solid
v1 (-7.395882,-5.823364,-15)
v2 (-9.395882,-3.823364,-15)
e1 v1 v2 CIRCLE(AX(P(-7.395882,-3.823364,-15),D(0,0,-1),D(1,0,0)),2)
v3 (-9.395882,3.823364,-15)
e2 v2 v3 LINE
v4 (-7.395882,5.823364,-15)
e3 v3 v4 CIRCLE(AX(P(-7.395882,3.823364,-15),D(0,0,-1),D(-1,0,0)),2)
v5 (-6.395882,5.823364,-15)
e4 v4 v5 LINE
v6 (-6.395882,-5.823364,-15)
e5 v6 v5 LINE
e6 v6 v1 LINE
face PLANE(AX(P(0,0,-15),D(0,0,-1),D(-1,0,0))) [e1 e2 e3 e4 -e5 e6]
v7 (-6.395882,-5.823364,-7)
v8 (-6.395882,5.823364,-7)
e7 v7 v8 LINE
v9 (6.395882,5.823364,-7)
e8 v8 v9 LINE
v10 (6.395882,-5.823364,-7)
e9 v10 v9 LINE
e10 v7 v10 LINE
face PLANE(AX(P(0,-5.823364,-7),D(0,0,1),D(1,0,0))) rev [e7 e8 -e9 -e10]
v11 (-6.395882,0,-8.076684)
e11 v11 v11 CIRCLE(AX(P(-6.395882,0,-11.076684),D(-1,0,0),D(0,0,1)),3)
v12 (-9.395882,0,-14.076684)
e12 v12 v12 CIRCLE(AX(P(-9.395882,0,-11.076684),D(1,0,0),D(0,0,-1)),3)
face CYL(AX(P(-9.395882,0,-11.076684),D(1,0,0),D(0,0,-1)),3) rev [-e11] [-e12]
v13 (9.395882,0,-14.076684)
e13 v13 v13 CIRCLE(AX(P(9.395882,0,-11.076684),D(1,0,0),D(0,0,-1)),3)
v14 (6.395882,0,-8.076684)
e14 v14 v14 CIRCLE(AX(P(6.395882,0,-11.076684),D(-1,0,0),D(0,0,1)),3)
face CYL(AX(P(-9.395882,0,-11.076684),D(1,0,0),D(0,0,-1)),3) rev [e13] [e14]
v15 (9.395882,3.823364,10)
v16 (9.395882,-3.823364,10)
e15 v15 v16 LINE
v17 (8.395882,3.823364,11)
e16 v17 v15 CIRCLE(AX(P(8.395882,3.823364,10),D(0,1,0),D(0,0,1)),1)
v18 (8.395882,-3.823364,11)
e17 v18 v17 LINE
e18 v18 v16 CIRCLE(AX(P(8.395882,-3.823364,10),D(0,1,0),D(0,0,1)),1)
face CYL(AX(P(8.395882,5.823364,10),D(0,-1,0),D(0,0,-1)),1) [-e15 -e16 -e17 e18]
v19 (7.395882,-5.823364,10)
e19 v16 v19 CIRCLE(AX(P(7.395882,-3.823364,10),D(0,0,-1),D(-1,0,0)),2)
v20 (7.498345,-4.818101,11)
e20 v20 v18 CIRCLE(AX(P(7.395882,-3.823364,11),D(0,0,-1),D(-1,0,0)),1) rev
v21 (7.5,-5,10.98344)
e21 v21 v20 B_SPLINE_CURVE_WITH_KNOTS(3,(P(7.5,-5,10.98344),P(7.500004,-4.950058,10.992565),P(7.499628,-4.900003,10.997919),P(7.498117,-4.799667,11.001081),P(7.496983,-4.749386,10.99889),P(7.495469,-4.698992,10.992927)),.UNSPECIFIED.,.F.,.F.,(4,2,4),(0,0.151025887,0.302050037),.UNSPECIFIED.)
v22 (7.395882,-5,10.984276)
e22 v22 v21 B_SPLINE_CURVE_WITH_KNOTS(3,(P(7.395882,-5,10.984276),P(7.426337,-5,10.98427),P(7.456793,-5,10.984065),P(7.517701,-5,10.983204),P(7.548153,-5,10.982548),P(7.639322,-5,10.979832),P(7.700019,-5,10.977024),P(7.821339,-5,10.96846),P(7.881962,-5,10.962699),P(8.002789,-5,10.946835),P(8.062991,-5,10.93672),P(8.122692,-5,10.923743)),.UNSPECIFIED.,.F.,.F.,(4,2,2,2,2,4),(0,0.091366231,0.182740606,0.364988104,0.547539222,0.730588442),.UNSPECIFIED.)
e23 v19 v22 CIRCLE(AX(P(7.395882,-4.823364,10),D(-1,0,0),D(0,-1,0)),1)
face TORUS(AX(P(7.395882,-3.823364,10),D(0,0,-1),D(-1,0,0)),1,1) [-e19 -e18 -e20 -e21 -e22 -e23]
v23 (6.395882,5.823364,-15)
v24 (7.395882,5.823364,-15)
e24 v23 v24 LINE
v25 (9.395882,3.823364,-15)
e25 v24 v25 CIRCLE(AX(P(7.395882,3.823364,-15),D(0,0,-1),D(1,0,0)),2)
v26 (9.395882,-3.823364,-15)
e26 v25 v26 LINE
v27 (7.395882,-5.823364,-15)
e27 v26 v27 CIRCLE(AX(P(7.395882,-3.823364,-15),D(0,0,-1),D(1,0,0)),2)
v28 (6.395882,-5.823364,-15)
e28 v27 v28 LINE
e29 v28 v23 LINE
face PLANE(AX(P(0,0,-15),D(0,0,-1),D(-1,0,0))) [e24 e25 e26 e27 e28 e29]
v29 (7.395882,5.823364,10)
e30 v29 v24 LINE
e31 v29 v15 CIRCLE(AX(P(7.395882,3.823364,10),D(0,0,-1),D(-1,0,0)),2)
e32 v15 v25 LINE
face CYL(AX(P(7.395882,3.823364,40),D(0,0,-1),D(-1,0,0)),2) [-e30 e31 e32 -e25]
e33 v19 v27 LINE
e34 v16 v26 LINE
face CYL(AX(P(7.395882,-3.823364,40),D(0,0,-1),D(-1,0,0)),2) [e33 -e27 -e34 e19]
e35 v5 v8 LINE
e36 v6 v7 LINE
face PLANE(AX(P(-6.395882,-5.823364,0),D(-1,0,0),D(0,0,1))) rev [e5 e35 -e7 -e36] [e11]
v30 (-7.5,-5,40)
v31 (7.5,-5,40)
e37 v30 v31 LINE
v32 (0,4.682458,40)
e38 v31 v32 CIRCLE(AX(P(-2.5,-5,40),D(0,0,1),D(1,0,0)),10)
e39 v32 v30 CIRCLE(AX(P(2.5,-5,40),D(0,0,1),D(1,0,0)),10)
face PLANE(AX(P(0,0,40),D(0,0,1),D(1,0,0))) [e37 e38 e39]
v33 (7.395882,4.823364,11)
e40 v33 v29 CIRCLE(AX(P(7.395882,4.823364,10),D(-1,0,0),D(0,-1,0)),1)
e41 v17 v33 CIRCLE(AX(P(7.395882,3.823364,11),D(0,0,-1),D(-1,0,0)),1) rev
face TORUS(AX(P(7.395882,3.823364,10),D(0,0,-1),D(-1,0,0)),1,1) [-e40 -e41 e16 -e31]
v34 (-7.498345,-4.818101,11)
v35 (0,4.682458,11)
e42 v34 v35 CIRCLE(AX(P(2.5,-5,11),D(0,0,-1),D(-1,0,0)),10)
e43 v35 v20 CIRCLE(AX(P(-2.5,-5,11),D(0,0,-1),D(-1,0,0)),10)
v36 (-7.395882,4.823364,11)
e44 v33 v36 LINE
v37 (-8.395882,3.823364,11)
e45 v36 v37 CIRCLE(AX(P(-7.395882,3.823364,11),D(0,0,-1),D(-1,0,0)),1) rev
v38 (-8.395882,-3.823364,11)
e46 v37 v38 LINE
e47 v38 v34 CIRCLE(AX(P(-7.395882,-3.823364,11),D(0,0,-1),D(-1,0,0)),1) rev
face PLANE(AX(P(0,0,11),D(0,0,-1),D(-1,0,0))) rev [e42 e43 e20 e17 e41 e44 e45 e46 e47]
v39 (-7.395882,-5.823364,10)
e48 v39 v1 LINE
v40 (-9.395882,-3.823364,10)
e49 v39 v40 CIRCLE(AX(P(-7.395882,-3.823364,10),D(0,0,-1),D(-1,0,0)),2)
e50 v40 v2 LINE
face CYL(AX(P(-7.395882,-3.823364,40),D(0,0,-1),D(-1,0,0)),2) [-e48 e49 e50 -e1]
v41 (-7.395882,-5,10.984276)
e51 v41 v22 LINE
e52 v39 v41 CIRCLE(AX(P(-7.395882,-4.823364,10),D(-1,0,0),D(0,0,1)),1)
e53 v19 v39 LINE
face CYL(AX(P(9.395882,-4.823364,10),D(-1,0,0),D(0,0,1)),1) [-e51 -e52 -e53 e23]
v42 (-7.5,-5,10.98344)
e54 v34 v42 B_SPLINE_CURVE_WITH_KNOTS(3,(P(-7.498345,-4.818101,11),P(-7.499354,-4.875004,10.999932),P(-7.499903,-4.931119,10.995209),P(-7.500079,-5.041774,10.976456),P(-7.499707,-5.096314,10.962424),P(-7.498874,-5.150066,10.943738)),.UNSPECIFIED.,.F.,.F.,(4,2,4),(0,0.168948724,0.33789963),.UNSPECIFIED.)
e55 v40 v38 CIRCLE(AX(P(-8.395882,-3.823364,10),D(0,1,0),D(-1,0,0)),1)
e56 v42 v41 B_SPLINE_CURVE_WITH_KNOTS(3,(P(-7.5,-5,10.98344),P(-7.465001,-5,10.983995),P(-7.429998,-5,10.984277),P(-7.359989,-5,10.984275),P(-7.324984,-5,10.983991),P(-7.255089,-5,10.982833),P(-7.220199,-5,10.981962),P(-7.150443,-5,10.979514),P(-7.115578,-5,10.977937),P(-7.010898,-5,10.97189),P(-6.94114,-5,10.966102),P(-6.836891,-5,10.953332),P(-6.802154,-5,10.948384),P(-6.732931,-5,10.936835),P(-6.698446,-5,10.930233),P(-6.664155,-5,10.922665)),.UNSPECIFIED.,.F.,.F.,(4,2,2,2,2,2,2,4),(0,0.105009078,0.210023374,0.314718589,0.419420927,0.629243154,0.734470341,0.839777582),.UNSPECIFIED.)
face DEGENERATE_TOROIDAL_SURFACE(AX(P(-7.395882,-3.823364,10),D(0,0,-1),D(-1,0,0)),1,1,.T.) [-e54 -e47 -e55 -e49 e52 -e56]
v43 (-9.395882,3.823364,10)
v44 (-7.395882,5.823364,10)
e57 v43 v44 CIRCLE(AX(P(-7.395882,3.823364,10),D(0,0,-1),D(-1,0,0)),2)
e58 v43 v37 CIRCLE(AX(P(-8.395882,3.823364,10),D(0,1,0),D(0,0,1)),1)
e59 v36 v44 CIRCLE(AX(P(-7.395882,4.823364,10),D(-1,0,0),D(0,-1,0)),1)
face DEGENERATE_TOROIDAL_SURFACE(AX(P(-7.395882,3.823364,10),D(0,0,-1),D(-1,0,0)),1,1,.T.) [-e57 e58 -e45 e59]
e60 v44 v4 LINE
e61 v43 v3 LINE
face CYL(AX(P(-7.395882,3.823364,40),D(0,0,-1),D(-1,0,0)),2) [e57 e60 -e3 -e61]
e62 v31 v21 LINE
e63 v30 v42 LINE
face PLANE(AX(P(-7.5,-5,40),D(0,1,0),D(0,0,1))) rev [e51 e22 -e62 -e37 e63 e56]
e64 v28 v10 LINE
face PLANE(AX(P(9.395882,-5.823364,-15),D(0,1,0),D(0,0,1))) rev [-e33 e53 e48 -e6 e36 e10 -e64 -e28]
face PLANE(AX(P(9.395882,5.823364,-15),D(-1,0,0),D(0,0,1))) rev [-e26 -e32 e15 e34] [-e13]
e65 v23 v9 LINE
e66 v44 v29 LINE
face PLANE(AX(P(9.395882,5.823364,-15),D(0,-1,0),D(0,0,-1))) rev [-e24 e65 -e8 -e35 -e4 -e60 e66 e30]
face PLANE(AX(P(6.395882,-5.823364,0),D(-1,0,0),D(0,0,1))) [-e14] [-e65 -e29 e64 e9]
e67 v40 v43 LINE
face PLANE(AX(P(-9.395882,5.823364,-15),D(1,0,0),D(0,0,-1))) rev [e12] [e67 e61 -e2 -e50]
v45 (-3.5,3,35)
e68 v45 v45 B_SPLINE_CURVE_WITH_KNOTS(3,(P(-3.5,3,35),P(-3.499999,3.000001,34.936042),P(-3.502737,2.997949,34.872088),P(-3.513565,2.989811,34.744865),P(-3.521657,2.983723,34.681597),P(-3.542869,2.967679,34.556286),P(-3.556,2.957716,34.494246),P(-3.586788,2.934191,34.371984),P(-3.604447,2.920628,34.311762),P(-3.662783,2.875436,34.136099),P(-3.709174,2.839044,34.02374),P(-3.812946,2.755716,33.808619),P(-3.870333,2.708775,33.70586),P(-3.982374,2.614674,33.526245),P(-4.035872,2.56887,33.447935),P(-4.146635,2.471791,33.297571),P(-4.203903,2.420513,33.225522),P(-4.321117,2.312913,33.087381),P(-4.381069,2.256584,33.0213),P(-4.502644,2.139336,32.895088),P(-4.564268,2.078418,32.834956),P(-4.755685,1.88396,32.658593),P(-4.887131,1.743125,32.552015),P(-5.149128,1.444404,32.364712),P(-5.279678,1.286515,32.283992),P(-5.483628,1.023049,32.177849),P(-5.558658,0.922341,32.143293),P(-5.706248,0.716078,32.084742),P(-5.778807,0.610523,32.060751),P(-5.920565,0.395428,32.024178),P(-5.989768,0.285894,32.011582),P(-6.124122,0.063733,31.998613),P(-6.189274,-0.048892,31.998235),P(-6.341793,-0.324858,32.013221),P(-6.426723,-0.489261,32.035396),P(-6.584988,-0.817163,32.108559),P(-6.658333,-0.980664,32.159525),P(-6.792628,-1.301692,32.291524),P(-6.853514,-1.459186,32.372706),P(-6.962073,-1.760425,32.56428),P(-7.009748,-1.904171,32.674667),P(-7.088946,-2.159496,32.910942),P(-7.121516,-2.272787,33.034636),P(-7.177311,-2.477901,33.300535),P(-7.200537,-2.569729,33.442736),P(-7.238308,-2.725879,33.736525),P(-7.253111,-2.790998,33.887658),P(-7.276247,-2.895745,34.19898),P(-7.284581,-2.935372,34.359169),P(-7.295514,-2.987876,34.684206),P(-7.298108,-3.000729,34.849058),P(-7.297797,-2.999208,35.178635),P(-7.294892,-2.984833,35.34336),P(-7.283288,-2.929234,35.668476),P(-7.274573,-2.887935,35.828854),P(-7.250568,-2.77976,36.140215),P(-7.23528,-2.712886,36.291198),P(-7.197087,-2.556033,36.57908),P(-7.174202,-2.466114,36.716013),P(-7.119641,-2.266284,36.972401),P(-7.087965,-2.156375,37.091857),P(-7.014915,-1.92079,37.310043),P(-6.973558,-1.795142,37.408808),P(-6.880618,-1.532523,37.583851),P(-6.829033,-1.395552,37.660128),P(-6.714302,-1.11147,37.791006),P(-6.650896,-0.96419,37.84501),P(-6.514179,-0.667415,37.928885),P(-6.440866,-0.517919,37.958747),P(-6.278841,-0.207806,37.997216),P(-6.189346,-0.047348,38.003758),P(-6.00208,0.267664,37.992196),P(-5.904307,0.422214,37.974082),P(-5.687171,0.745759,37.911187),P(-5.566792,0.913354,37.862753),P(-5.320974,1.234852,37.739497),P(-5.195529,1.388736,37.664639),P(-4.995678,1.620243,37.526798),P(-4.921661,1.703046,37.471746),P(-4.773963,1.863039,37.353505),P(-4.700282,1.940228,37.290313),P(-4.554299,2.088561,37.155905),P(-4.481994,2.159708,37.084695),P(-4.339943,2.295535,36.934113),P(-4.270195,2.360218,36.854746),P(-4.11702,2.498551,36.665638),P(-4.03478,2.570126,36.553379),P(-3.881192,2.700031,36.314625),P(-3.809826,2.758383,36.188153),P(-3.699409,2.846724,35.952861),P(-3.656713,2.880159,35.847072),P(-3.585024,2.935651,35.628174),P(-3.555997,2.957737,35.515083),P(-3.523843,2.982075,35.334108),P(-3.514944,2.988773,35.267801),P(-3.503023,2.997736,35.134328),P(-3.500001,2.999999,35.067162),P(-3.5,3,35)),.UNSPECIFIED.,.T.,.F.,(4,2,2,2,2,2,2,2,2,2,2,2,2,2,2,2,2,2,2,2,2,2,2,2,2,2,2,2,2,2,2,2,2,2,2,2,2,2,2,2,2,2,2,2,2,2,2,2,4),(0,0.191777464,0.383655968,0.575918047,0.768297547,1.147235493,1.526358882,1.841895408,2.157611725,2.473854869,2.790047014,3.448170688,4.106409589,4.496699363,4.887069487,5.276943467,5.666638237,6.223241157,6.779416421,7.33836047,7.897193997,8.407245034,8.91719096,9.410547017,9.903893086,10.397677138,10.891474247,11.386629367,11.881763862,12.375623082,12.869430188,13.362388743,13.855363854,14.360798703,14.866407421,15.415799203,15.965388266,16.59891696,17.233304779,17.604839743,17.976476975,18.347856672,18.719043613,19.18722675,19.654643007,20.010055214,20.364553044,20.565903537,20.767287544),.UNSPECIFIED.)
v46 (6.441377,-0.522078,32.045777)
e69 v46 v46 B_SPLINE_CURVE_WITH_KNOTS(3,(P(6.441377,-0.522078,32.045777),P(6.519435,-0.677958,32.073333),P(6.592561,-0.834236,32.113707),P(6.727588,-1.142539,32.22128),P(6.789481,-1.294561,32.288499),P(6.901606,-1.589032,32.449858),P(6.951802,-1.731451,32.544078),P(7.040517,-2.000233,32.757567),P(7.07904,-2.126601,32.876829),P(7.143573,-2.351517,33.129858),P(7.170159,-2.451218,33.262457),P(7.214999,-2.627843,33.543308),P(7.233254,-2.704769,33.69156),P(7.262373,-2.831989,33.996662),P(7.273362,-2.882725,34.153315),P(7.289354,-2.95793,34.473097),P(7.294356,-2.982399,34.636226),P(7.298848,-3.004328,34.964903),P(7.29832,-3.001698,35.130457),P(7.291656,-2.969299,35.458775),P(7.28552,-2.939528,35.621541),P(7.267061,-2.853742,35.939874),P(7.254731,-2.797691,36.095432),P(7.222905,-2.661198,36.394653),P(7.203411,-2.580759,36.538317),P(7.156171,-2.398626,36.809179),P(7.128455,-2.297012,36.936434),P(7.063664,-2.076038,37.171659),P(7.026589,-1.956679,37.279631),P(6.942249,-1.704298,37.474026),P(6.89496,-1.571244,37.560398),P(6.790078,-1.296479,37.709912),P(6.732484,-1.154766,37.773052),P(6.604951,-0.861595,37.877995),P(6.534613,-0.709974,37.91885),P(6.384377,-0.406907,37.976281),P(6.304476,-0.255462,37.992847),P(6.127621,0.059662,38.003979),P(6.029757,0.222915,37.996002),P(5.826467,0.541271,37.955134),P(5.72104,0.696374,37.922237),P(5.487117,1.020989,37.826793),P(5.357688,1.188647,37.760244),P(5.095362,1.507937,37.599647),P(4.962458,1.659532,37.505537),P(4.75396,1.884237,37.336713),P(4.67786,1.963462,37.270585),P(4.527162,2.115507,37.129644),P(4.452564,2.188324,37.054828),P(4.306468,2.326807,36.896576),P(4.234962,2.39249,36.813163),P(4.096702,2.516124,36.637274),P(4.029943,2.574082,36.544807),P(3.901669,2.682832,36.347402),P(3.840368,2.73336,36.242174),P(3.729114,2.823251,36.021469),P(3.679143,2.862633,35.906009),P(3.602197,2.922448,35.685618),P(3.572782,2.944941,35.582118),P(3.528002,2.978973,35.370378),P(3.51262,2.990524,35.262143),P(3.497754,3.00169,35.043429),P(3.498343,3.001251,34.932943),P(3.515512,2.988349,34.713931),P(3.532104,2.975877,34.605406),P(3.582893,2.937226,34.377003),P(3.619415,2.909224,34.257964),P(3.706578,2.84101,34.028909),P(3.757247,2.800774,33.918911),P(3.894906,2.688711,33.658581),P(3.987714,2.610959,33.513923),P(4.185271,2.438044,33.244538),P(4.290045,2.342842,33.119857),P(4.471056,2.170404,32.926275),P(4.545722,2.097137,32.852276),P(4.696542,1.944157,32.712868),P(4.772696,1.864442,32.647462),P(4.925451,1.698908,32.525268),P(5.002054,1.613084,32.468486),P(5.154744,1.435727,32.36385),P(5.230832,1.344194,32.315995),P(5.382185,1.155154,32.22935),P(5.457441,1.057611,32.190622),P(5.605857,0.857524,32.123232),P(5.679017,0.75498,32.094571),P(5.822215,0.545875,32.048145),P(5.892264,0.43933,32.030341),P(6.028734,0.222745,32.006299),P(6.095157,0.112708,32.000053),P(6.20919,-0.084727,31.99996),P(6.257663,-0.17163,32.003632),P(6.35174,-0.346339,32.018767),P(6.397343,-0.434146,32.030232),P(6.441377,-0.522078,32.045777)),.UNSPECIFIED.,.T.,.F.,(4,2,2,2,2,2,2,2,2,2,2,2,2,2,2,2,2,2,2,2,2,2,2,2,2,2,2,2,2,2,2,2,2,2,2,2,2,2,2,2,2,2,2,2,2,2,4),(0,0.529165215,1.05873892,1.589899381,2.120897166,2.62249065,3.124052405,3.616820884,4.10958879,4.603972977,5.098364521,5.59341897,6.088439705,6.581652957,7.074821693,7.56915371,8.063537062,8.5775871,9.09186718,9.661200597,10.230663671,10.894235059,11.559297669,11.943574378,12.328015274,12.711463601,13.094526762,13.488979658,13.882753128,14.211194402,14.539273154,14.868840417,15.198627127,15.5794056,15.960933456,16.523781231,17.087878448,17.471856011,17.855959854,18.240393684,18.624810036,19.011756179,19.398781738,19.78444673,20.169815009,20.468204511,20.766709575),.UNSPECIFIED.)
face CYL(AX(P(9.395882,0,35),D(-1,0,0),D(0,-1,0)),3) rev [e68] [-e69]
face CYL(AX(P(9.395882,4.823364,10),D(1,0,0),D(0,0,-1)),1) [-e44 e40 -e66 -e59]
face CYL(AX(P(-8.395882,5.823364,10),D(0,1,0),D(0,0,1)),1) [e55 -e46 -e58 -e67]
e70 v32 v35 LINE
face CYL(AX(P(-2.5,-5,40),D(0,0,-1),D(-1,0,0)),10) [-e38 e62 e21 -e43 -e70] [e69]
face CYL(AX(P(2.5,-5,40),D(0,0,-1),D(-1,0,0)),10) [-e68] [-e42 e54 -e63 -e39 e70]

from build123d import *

# Parameters (mm, degrees)
SKETCH1_W                = 15
SKETCH1_H                = 10
BOSS_EXTRUDE1_DEPTH      = 40
BOSS_EXTRUDE2_DEPTH      = 15
BOSS_EXTRUDE2_DEPTH_BACK = 11
SKETCH3_W                = 18.791763322
SKETCH3_H                = 11.646727992
SKETCH4_W                = 12.791763322
SKETCH4_H                = 8
CUT_EXTRUDE1_DEPTH       = 43.707480201
SKETCH5_R                = 3
CUT_EXTRUDE2_DEPTH       = 44.810756502
CUT_EXTRUDE3_DEPTH       = 49.282441533
CUT_EXTRUDE3_DEPTH_BACK  = 49.282441533
SKETCH6_OUTSIDE_W        = 32.648
SKETCH6_OUTSIDE_H        = 25.502
FILLET1_R                = 10
FILLET2_R                = 1
SKETCH7_R                = 3
CUT_EXTRUDE4_DEPTH       = 45.576248719


with BuildPart() as part:
    # Sketch1 → Boss-Extrude1 (new body)
    with BuildSketch(Plane.XY):
        Rectangle(SKETCH1_W, SKETCH1_H)
    extrude(amount=BOSS_EXTRUDE1_DEPTH)

    # Sketch3 → Boss-Extrude2 (add, two sides: drawn at the far end of the back side and taken through both)
    with BuildSketch(Plane(origin=(0, 0, 0), x_dir=(-1, 0, 0), z_dir=(0, 0, -1)).offset(-BOSS_EXTRUDE2_DEPTH_BACK)):
        Rectangle(SKETCH3_W, SKETCH3_H)
    extrude(amount=BOSS_EXTRUDE2_DEPTH + BOSS_EXTRUDE2_DEPTH_BACK)

    # Sketch4 → Cut-Extrude1 (cut, through all)
    with BuildSketch(Plane(origin=(0, 5.823363996, 0), x_dir=(1, 0, 0), z_dir=(0, 1, 0))):
        with Locations((0, 11)):
            Rectangle(SKETCH4_W, SKETCH4_H)
    extrude(amount=-CUT_EXTRUDE1_DEPTH, mode=Mode.SUBTRACT)

    # Sketch5 → Cut-Extrude2 (cut, through all)
    with BuildSketch(Plane.ZY.offset(7.5)):
        with Locations(Location((35, 0, 0), (0, 0, 270))):
            Circle(SKETCH5_R)
    extrude(amount=-CUT_EXTRUDE2_DEPTH, mode=Mode.SUBTRACT)

    # Sketch6 outside → Cut-Extrude3 (cut, two sides: drawn at the far end of the back side and taken through both)
    with BuildSketch(Plane(origin=(0, 0, -7), x_dir=(-1, 0, 0), z_dir=(0, 0, -1)).offset(-CUT_EXTRUDE3_DEPTH_BACK)):
        Rectangle(SKETCH6_OUTSIDE_W, SKETCH6_OUTSIDE_H)
        with BuildLine():
            Line((-7.395881661, 5.823363996), (7.395881661, 5.823363996))
            ThreePointArc((7.395881661, 5.823363996), (8.810095223, 5.237577558), (9.395881661, 3.823363996))
            Line((9.395881661, 3.823363996), (9.395881661, -3.823363996))
            ThreePointArc((9.395881661, -3.823363996), (8.810095223, -5.237577558), (7.395881661, -5.823363996))
            Line((7.395881661, -5.823363996), (-7.395881661, -5.823363996))
            ThreePointArc((-7.395881661, -5.823363996), (-8.810095223, -5.237577558), (-9.395881661, -3.823363996))
            Line((-9.395881661, -3.823363996), (-9.395881661, 3.823363996))
            ThreePointArc((-9.395881661, 3.823363996), (-8.810095223, 5.237577558), (-7.395881661, 5.823363996))
        make_face(mode=Mode.SUBTRACT)
    extrude(amount=CUT_EXTRUDE3_DEPTH + CUT_EXTRUDE3_DEPTH_BACK, mode=Mode.SUBTRACT)

    # Fillet1
    # the kernel refuses this fillet: 10 mm, written as the material it takes off along each edge
    with BuildSketch(Plane(origin=(-7.5, 5, 11), x_dir=(1, 0, 0), z_dir=(0, 0, 1))) as fillet1_piece_1:
        with BuildLine():
            CenterArc((FILLET1_R, -FILLET1_R), FILLET1_R, 90, 90)
            Line((0, -FILLET1_R), (0, 0))
            Line((0, 0), (FILLET1_R, 0))
        make_face()
    extrude(amount=54, mode=Mode.SUBTRACT)
    with BuildSketch(Plane(origin=(7.5, 5, 11), x_dir=(-1, 0, 0), z_dir=(0, 0, 1))) as fillet1_piece_2:
        with BuildLine():
            CenterArc((FILLET1_R, FILLET1_R), FILLET1_R, 180, 90)
            Line((0, FILLET1_R), (0, 0))
            Line((0, 0), (FILLET1_R, 0))
        make_face()
    extrude(amount=54, mode=Mode.SUBTRACT)

    # Fillet2
    # the kernel refuses this fillet: 1 mm, written as the material it takes off along each edge
    with BuildSketch(Plane(origin=(-7.395881661, 3.823363996, 11), x_dir=(0, 1, 0), z_dir=(1, 0, 0))) as fillet2_piece_1:
        with BuildLine():
            CenterArc((2 - FILLET2_R, -FILLET2_R), FILLET2_R, 0, 90)
            Line((2, -FILLET2_R), (2, 0))
            Line((2, 0), (2 - FILLET2_R, 0))
        make_face()
    revolve(axis=Axis((-7.395881661, 3.823363996, 11), (0, 0, 1)), revolution_arc=90, mode=Mode.SUBTRACT)
    with BuildSketch(Plane(origin=(-9.395881661, 3.823363996, 11), x_dir=(1, 0, 0), z_dir=(0, -1, 0)), Plane(origin=(9.395881661, -3.823363996, 11), x_dir=(-1, 0, 0), z_dir=(0, 1, 0))) as fillet2_piece_2:
        with BuildLine():
            CenterArc((FILLET2_R, -FILLET2_R), FILLET2_R, 90, 90)
            Line((0, -FILLET2_R), (0, 0))
            Line((0, 0), (FILLET2_R, 0))
        make_face()
    extrude(amount=7.646727992, mode=Mode.SUBTRACT)
    with BuildSketch(Plane(origin=(-7.395881661, -3.823363996, 11), x_dir=(-1, 0, 0), z_dir=(0, 1, 0))) as fillet2_piece_3_section:
        with BuildLine():
            CenterArc((2 - FILLET2_R, -FILLET2_R), FILLET2_R, 0, 90)
            Line((2, -FILLET2_R), (2, 0))
            Line((2, 0), (2 - FILLET2_R, 0))
        make_face()
    fillet2_piece_3 = revolve(axis=Axis((-7.395881661, -3.823363996, 11), (0, 0, 1)), revolution_arc=90, mode=Mode.PRIVATE)
    fillet2_piece_3 = fillet2_piece_3 - Plane(origin=(2.5, -5, 10.778934244), x_dir=(1, 0, 0), z_dir=(0, 0, -1)) * Cylinder(10, 8, mode=Mode.PRIVATE)
    fillet2_piece_3 = split(fillet2_piece_3, bisect_by=Plane(origin=(-8.996433691, -5, 10.778934244), z_dir=(0, 1, 0)), keep=Keep.TOP, mode=Mode.PRIVATE)
    add(fillet2_piece_3, mode=Mode.SUBTRACT)
    with BuildSketch(Plane(origin=(-7.395881661, -3.823363996, 11), x_dir=(-1, 0, 0), z_dir=(0, 1, 0))) as fillet2_piece_4_section:
        with BuildLine():
            CenterArc((2 - FILLET2_R, -FILLET2_R), FILLET2_R, 0, 90)
            Line((2, -FILLET2_R), (2, 0))
            Line((2, 0), (2 - FILLET2_R, 0))
        make_face()
    fillet2_piece_4 = revolve(axis=Axis((-7.395881661, -3.823363996, 11), (0, 0, 1)), revolution_arc=90, mode=Mode.PRIVATE)
    fillet2_piece_4 = fillet2_piece_4 - Plane(origin=(2.5, -5, 10.736771206), x_dir=(1, 0, 0), z_dir=(0, 0, -1)) * Cylinder(10, 8, mode=Mode.PRIVATE)
    fillet2_piece_4 = split(fillet2_piece_4, bisect_by=Plane(origin=(-8.184472941, -5, 10.736771206), z_dir=(0, -1, 0)), keep=Keep.TOP, mode=Mode.PRIVATE)
    add(fillet2_piece_4, mode=Mode.SUBTRACT)
    with BuildSketch(Plane(origin=(-7.395881661, -3.823363996, 11), x_dir=(-1, 0, 0), z_dir=(0, 1, 0))) as fillet2_piece_5_section:
        with BuildLine():
            CenterArc((2 - FILLET2_R, -FILLET2_R), FILLET2_R, 0, 90)
            Line((2, -FILLET2_R), (2, 0))
            Line((2, 0), (2 - FILLET2_R, 0))
        make_face()
    fillet2_piece_5 = revolve(axis=Axis((-7.395881661, -3.823363996, 11), (0, 0, 1)), revolution_arc=90, mode=Mode.PRIVATE)
    fillet2_piece_5 = fillet2_piece_5 & Plane(origin=(2.5, -5, 10.786120947), x_dir=(1, 0, 0), z_dir=(0, 0, -1)) * Cylinder(10, 8, mode=Mode.PRIVATE)
    fillet2_piece_5 = split(fillet2_piece_5, bisect_by=Plane(origin=(-7.438386145, -5, 10.786120947), z_dir=(0, -1, 0)), keep=Keep.TOP, mode=Mode.PRIVATE)
    add(fillet2_piece_5, mode=Mode.SUBTRACT)
    with BuildSketch(Plane(origin=(7.395881661, -3.823363996, 11), x_dir=(0, -1, 0), z_dir=(-1, 0, 0))) as fillet2_piece_6_section:
        with BuildLine():
            CenterArc((2 - FILLET2_R, -FILLET2_R), FILLET2_R, 0, 90)
            Line((2, -FILLET2_R), (2, 0))
            Line((2, 0), (2 - FILLET2_R, 0))
        make_face()
    fillet2_piece_6 = revolve(axis=Axis((7.395881661, -3.823363996, 11), (0, 0, 1)), revolution_arc=90, mode=Mode.PRIVATE)
    fillet2_piece_6 = fillet2_piece_6 & Plane(origin=(-2.5, -5, 10.786120921), x_dir=(-1, 0, 0), z_dir=(0, 0, -1)) * Cylinder(10, 8, mode=Mode.PRIVATE)
    fillet2_piece_6 = split(fillet2_piece_6, bisect_by=Plane(origin=(7.438386148, -5, 10.786120921), z_dir=(0, -1, 0)), keep=Keep.TOP, mode=Mode.PRIVATE)
    add(fillet2_piece_6, mode=Mode.SUBTRACT)
    with BuildSketch(Plane(origin=(7.395881661, -3.823363996, 11), x_dir=(0, -1, 0), z_dir=(-1, 0, 0))) as fillet2_piece_7_section:
        with BuildLine():
            CenterArc((2 - FILLET2_R, -FILLET2_R), FILLET2_R, 0, 90)
            Line((2, -FILLET2_R), (2, 0))
            Line((2, 0), (2 - FILLET2_R, 0))
        make_face()
    fillet2_piece_7 = revolve(axis=Axis((7.395881661, -3.823363996, 11), (0, 0, 1)), revolution_arc=90, mode=Mode.PRIVATE)
    fillet2_piece_7 = fillet2_piece_7 - Plane(origin=(-2.5, -5, 10.778934427), x_dir=(-1, 0, 0), z_dir=(0, 0, -1)) * Cylinder(10, 8, mode=Mode.PRIVATE)
    fillet2_piece_7 = split(fillet2_piece_7, bisect_by=Plane(origin=(8.996433978, -5, 10.778934427), z_dir=(0, 1, 0)), keep=Keep.TOP, mode=Mode.PRIVATE)
    add(fillet2_piece_7, mode=Mode.SUBTRACT)
    with BuildSketch(Plane(origin=(7.395881661, -3.823363996, 11), x_dir=(0, -1, 0), z_dir=(-1, 0, 0))) as fillet2_piece_8_section:
        with BuildLine():
            CenterArc((2 - FILLET2_R, -FILLET2_R), FILLET2_R, 0, 90)
            Line((2, -FILLET2_R), (2, 0))
            Line((2, 0), (2 - FILLET2_R, 0))
        make_face()
    fillet2_piece_8 = revolve(axis=Axis((7.395881661, -3.823363996, 11), (0, 0, 1)), revolution_arc=90, mode=Mode.PRIVATE)
    fillet2_piece_8 = fillet2_piece_8 - Plane(origin=(-2.5, -5, 10.736771126), x_dir=(-1, 0, 0), z_dir=(0, 0, -1)) * Cylinder(10, 8, mode=Mode.PRIVATE)
    fillet2_piece_8 = split(fillet2_piece_8, bisect_by=Plane(origin=(8.184472929, -5, 10.736771126), z_dir=(0, -1, 0)), keep=Keep.TOP, mode=Mode.PRIVATE)
    add(fillet2_piece_8, mode=Mode.SUBTRACT)
    with BuildSketch(Plane(origin=(7.395881661, 3.823363996, 11), x_dir=(1, 0, 0), z_dir=(0, -1, 0))) as fillet2_piece_9:
        with BuildLine():
            CenterArc((2 - FILLET2_R, -FILLET2_R), FILLET2_R, 0, 90)
            Line((2, -FILLET2_R), (2, 0))
            Line((2, 0), (2 - FILLET2_R, 0))
        make_face()
    revolve(axis=Axis((7.395881661, 3.823363996, 11), (0, 0, 1)), revolution_arc=90, mode=Mode.SUBTRACT)
    with BuildSketch(Plane(origin=(7.395881661, 5.823363996, 11), x_dir=(0, -1, 0), z_dir=(-1, 0, 0))) as fillet2_piece_10:
        with BuildLine():
            CenterArc((FILLET2_R, -FILLET2_R), FILLET2_R, 90, 90)
            Line((0, -FILLET2_R), (0, 0))
            Line((0, 0), (FILLET2_R, 0))
        make_face()
    extrude(amount=14.791763321, mode=Mode.SUBTRACT)
    with BuildSketch(Plane(origin=(-7.395881661, -5.823363996, 11), x_dir=(0, 1, 0), z_dir=(1, 0, 0))) as fillet2_piece_11_section:
        with BuildLine():
            CenterArc((FILLET2_R, -FILLET2_R), FILLET2_R, 90, 90)
            Line((0, -FILLET2_R), (0, 0))
            Line((0, 0), (FILLET2_R, 0))
        make_face()
    fillet2_piece_11 = extrude(amount=14.791763321, mode=Mode.PRIVATE)
    fillet2_piece_11 = split(fillet2_piece_11, bisect_by=Plane(origin=(0, -5, 10.769455145), z_dir=(0, -1, 0)), keep=Keep.TOP, mode=Mode.PRIVATE)
    add(fillet2_piece_11, mode=Mode.SUBTRACT)

    # Sketch7 → Cut-Extrude4 (cut, through all)
    with BuildSketch(Plane(origin=(9.395881661, 0, 0), x_dir=(0, 0, -1), z_dir=(1, 0, 0))):
        with Locations((11.076683863, 0)):
            Circle(SKETCH7_R)
    extrude(amount=-CUT_EXTRUDE4_DEPTH, mode=Mode.SUBTRACT)


solid = part.part
